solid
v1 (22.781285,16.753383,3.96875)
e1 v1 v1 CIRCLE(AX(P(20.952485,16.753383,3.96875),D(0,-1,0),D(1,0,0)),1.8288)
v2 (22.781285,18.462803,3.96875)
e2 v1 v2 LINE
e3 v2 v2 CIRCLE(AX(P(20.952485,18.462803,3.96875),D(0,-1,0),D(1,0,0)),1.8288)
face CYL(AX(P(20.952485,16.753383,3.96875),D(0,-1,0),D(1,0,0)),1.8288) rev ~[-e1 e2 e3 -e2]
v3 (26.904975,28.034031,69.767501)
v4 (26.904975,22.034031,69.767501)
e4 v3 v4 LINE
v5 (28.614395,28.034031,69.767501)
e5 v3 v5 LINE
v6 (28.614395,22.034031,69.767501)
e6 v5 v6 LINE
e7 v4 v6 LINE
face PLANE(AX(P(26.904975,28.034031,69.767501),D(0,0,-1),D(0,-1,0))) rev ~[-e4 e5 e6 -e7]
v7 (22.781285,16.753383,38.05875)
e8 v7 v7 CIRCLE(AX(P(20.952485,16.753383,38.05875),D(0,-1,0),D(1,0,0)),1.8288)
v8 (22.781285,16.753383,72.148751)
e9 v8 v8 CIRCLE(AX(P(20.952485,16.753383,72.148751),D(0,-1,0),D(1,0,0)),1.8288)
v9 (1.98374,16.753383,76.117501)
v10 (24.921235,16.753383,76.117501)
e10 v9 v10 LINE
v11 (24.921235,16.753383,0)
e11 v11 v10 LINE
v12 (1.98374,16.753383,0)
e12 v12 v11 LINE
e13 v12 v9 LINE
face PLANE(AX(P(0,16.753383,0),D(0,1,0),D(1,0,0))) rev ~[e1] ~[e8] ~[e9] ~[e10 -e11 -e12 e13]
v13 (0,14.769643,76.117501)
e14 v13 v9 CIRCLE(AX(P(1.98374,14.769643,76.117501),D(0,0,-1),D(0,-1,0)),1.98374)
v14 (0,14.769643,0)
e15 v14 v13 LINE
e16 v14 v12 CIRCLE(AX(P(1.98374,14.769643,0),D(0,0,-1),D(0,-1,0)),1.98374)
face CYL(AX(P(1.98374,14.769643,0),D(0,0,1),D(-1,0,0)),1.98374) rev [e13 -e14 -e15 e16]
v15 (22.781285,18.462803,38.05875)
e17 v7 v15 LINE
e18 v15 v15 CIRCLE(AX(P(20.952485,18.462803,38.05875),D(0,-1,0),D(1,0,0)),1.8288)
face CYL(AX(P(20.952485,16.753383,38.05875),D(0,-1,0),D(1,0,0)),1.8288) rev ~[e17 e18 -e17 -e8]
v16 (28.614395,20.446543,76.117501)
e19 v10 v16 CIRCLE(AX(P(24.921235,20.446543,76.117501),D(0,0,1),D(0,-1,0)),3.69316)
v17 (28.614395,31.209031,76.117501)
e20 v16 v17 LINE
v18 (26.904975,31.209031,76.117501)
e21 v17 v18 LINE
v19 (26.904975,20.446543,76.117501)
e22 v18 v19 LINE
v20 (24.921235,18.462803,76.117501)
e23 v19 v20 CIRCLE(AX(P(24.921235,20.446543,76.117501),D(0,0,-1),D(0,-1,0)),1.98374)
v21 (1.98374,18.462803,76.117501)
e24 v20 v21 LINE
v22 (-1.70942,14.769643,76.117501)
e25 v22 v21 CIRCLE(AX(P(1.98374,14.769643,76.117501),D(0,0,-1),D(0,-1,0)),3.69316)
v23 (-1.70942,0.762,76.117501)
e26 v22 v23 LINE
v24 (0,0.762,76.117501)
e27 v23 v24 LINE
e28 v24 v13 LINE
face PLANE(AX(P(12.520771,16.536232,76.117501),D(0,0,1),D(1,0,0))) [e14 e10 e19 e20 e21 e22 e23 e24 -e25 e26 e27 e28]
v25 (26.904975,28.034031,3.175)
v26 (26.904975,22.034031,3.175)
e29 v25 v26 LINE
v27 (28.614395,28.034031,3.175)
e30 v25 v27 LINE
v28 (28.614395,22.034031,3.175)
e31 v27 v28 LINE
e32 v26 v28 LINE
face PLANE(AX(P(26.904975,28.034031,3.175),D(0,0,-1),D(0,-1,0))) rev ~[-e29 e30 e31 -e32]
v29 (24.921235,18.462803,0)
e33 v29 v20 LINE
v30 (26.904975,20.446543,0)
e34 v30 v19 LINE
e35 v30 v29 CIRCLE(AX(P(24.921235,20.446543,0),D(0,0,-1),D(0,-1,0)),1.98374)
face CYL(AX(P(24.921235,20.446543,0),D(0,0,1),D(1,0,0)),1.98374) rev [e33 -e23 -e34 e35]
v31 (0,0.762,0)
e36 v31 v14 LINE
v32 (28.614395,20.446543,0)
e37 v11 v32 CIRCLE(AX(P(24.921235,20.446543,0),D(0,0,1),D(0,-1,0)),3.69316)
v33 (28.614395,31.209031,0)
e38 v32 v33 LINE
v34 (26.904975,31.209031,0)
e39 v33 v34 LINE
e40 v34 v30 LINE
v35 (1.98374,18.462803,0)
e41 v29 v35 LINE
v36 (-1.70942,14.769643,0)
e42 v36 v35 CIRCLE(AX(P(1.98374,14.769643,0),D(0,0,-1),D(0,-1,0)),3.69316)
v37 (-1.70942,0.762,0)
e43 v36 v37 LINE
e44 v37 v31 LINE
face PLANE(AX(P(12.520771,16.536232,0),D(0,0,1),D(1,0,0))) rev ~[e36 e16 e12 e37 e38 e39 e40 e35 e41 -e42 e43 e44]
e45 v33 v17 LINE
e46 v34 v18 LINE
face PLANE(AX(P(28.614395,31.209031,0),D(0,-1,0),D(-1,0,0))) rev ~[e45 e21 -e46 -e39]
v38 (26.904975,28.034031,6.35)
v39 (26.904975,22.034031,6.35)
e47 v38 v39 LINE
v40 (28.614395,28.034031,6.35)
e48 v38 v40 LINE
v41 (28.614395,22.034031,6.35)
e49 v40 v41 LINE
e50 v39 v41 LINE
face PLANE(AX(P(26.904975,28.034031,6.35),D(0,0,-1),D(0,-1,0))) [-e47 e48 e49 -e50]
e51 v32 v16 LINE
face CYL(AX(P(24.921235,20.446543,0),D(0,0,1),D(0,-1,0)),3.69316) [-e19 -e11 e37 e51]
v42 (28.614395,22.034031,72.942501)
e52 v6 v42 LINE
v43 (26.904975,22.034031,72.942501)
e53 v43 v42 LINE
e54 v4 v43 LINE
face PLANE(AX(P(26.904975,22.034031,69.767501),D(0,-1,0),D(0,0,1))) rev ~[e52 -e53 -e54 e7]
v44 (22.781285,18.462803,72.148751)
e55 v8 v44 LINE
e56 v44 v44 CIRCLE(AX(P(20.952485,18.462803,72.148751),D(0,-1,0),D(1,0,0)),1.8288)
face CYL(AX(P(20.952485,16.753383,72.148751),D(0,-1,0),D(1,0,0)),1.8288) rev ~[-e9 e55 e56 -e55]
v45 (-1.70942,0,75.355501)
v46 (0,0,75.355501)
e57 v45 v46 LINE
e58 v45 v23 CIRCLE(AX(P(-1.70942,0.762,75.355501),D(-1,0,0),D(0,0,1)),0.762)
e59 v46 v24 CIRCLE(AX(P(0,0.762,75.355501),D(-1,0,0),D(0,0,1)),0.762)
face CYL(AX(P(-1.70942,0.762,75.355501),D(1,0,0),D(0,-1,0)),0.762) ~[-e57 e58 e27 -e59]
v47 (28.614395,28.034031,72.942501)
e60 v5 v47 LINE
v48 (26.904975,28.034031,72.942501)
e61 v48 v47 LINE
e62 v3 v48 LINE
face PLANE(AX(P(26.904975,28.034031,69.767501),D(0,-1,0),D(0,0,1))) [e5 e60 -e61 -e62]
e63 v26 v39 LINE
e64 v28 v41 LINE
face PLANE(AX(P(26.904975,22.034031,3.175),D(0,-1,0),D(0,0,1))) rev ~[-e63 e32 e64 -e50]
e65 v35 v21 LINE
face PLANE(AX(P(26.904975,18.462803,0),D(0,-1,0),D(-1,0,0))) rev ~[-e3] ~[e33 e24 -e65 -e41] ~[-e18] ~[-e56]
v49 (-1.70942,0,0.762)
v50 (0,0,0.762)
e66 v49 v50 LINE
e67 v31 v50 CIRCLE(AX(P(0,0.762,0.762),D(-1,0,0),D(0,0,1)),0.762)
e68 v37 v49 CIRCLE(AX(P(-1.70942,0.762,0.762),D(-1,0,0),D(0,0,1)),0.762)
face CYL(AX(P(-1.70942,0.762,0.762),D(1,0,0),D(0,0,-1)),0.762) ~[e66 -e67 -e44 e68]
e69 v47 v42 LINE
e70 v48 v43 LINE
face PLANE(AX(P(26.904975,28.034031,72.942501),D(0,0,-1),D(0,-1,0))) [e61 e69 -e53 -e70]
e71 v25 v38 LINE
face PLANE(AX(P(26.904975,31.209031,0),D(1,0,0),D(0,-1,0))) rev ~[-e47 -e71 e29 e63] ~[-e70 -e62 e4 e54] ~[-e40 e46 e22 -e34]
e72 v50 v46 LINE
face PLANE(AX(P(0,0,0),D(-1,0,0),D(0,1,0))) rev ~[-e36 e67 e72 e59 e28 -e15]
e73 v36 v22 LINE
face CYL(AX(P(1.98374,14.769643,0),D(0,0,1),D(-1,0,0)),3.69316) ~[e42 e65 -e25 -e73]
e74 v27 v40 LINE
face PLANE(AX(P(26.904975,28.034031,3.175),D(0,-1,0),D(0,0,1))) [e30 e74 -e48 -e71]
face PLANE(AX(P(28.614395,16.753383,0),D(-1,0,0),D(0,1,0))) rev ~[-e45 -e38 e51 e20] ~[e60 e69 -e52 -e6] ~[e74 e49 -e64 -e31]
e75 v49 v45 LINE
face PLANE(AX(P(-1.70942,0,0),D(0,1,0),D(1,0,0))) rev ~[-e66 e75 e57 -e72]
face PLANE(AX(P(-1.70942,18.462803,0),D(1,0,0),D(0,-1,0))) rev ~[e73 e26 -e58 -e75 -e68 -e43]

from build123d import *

# Parameters (mm, degrees)
F1_DEPTH = 76.1175008
F2_R     = 1.98374
F3_R     = 3.69316
F4_R     = 1.8288
F5_DEPTH = 1.70942
F6_R     = 0.762
F7_W     = 6
F7_H     = 3.175
F8_DEPTH = 1.70942


# Not quite as in the source:
# - a feature names something its author has since deleted; it is built from what else it names


with BuildPart() as f1:
    # F0 (on Top) → F1 (new body)
    with BuildSketch(Plane.XY):
        Polygon((-1.70942, 0), (0, 0), (0, 16.7533828), (28.6143954, 16.7533828), (28.6143954, 31.2090308), (26.9049754, 31.2090308), (26.9049754, 18.4628028), (-1.70942, 18.4628028), align=None)
    extrude(amount=F1_DEPTH)

    # F2
    f2_edges = [f1.edges().sort_by_distance(p)[0] for p in [
        (0, 16.753383, 38.05875),
        (26.904975, 18.462803, 38.05875),
    ]]
    fillet(f2_edges, radius=F2_R)

    # F3
    f3_edges = [f1.edges().sort_by_distance(p)[0] for p in [
        (-1.70942, 18.462803, 38.05875),
        (28.614395, 16.753383, 38.05875),
    ]]
    fillet(f3_edges, radius=F3_R)

    # F4 (on face) → F5 (cut, through all)
    with BuildSketch(Plane.XZ.offset(-16.7533828)):
        with Locations((20.9524854, 72.1487508)):
            Circle(F4_R)
        with Locations((20.9524854, 38.0587504)):
            Circle(F4_R)
        with Locations((20.9524854, 3.96875)):
            Circle(F4_R)
    extrude(amount=-F5_DEPTH, mode=Mode.SUBTRACT)

    # F6
    f6_edges = [f1.edges().sort_by_distance(p)[0] for p in [
        (-0.85471, 0, 76.117501),
        (-0.85471, 0, 0),
    ]]
    fillet(f6_edges, radius=F6_R)

    # F7 (on face) → F8 (cut, through all)
    with BuildSketch(Plane(origin=(26.9049754, 0, 0), x_dir=(0, -1, 0), z_dir=(-1, 0, 0))):
        with Locations((-25.0340308, 71.3550008)):
            Rectangle(F7_W, F7_H)
        with Locations((-25.0340308, 4.7625)):
            Rectangle(F7_W, F7_H)
    extrude(amount=-F8_DEPTH, mode=Mode.SUBTRACT)


solid = f1.part
